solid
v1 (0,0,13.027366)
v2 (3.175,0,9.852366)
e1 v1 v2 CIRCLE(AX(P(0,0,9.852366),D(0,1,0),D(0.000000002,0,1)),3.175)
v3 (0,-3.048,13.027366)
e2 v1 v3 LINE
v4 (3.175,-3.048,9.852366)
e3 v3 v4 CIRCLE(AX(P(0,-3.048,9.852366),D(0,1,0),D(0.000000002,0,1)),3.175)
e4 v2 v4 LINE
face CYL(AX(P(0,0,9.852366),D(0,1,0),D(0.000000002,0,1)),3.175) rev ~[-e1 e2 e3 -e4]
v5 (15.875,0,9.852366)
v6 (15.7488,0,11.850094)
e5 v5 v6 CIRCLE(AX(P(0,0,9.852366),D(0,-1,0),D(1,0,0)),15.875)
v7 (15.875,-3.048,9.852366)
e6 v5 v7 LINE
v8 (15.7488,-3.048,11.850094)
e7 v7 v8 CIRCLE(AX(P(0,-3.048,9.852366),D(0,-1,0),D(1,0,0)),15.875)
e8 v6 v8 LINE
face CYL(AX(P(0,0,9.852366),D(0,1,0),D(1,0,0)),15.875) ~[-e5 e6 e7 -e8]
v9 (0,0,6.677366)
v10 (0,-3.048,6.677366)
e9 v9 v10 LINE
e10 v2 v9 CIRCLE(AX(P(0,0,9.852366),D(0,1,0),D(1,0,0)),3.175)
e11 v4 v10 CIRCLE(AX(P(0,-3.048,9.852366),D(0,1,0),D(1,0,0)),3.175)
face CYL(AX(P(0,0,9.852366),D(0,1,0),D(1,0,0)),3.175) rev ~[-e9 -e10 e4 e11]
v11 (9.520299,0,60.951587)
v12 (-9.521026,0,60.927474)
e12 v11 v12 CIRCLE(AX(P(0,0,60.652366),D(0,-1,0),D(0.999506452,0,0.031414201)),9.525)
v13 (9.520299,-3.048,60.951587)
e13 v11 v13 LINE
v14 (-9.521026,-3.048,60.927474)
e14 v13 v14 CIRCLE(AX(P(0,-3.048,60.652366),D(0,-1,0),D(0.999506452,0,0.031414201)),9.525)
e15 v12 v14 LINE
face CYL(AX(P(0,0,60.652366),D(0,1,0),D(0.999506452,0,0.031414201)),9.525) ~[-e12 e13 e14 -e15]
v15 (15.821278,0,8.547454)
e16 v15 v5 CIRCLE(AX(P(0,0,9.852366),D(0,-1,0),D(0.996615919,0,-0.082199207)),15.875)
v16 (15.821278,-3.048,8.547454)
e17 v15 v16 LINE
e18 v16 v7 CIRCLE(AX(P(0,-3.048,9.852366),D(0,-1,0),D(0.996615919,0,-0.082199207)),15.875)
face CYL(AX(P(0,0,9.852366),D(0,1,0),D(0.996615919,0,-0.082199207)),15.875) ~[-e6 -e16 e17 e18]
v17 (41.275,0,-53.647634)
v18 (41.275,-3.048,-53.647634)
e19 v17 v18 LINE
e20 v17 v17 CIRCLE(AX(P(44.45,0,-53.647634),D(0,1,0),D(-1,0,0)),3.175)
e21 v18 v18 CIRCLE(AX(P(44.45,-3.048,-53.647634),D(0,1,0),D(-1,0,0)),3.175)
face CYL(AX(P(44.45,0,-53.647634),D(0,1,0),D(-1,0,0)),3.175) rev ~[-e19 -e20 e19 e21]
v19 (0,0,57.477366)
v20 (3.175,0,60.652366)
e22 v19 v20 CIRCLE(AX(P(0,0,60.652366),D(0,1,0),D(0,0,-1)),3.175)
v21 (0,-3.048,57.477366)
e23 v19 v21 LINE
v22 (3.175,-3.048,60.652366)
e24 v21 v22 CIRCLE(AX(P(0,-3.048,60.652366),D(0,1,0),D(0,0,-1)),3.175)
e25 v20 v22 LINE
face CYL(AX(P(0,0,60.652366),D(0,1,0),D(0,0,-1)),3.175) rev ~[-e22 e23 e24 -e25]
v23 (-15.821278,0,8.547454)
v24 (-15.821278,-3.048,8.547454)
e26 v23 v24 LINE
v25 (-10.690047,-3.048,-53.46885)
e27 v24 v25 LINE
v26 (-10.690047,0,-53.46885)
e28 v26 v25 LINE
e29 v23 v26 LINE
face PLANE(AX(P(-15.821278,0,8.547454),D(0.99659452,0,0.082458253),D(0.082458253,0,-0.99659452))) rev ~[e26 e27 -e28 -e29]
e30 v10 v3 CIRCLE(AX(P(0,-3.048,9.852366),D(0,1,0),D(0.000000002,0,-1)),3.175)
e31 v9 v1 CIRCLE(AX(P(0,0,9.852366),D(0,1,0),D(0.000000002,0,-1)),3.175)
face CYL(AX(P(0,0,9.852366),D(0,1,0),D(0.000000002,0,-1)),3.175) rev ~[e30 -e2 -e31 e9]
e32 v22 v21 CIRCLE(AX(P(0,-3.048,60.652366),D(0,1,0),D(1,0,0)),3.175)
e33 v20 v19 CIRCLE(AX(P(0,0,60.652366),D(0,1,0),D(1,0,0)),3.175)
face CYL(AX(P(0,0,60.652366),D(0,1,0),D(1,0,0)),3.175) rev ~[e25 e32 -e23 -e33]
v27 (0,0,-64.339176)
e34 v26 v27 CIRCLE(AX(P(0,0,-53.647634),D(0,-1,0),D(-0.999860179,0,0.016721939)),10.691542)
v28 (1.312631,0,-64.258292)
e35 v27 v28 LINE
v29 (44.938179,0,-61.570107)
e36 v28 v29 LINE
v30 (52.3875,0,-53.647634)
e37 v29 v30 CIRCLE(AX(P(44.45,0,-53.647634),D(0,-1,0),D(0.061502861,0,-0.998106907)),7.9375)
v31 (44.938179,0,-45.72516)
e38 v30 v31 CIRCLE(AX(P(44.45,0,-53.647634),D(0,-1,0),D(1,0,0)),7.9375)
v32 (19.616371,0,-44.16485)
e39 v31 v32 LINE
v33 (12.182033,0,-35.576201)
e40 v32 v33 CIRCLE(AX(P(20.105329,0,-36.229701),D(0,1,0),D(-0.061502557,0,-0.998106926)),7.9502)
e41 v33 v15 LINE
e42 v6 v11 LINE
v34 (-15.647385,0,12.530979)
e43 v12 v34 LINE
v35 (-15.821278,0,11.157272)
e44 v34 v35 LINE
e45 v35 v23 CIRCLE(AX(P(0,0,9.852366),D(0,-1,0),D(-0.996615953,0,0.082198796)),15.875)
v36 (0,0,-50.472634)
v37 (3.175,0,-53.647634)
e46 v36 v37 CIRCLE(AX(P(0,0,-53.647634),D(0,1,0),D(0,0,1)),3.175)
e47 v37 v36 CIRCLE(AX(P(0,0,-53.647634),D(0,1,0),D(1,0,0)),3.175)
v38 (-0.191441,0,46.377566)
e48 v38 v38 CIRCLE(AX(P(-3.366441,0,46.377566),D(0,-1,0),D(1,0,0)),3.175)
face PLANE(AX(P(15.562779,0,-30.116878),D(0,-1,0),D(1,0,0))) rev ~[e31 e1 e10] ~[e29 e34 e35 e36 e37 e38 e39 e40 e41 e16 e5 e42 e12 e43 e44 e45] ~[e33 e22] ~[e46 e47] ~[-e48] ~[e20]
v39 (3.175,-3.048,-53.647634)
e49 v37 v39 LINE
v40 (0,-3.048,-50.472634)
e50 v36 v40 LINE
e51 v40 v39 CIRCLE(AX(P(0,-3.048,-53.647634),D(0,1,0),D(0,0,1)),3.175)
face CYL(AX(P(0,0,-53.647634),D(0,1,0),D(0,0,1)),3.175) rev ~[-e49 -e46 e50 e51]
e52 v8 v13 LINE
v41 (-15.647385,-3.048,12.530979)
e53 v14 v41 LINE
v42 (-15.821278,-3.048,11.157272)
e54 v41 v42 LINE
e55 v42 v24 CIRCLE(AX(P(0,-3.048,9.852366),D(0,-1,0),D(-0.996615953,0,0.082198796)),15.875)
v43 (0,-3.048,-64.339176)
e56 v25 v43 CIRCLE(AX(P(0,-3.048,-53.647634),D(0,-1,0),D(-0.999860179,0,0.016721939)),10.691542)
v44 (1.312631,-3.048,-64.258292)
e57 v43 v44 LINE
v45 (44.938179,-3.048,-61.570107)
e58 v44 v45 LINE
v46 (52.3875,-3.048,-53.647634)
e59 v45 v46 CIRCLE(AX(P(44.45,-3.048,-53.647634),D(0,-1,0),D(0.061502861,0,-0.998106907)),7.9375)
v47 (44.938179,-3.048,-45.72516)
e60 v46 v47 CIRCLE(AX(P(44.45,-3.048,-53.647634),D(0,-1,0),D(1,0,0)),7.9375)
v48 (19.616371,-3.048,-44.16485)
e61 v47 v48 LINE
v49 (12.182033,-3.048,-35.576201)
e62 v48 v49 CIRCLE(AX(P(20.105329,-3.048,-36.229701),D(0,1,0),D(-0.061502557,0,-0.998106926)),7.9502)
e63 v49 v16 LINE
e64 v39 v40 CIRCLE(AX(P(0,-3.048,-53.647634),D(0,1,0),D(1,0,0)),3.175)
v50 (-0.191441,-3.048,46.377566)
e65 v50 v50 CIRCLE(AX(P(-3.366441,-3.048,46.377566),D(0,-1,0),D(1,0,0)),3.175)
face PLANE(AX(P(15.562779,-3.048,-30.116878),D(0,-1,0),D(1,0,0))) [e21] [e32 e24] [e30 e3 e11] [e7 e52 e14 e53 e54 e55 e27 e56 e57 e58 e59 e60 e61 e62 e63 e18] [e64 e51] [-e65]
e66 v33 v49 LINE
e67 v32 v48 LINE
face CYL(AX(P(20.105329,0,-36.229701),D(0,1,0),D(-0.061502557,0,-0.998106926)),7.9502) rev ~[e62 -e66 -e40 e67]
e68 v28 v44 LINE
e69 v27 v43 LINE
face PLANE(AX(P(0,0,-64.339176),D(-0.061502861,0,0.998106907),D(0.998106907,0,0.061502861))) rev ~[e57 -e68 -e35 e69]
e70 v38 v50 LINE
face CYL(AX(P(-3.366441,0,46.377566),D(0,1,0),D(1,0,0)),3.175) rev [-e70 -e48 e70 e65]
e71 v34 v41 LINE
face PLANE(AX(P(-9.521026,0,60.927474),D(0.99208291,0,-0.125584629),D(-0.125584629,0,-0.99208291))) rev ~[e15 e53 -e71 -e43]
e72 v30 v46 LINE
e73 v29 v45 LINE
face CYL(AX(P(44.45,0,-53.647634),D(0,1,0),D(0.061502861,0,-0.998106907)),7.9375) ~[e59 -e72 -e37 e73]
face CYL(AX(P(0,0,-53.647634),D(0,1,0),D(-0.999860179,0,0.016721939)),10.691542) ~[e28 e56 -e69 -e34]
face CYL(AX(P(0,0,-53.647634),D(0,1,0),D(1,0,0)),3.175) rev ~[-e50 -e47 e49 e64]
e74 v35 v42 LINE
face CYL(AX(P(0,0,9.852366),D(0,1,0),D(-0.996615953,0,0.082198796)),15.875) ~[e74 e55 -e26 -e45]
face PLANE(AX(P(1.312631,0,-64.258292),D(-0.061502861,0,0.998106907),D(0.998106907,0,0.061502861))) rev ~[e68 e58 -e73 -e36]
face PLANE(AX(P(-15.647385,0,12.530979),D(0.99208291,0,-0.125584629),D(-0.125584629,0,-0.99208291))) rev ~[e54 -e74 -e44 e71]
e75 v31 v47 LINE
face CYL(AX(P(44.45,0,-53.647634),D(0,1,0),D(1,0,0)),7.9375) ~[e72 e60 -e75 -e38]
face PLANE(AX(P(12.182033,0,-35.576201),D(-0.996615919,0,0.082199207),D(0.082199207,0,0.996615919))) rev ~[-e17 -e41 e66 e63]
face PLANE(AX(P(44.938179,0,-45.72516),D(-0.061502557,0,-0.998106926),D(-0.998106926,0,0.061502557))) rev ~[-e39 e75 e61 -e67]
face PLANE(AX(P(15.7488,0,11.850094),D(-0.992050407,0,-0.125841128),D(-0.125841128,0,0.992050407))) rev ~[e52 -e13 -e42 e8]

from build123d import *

# Parameters (mm, degrees)
F0_R     = 3.175
F1_DEPTH = 3.048


# Not quite as in the source:
# - ends of sketch curves that miss each other by under 0.0002 mm in the source are joined


with BuildPart() as f1:
    # F0 (on Front) → F1 (new body)
    with BuildSketch(Plane.XZ):
        with BuildLine():
            ThreePointArc((0, -42.9560914541), (7.5600620245, -46.0875716771), (10.6915422474, -53.6476337016))
            Line((10.6915422474, -53.6476337016), (36.5125, -53.6476337016))
            ThreePointArc((36.5125, -53.6476337016), (39.0126759444, -47.8649515069), (44.9381789581, -45.725160126))
            Line((44.9381789581, -45.725160126), (19.6163710563, -44.1648504083))
            ThreePointArc((19.6163710563, -44.1648504083), (14.0942781367, -41.4328681595), (12.1820328049, -35.5762005907))
            Line((12.1820328049, -35.5762005907), (15.8212777121, 8.5474538872))
            ThreePointArc((15.8212777121, 8.5474538872), (10.7540722598, -1.825200003), (0, -6.0226337016))
            Line((0, -6.0226337016), (0, -42.9560914541))
        make_face()
        with BuildLine():
            ThreePointArc((-10.690047341, -53.4688503814), (-7.4965860966, -46.0246242876), (0, -42.9560914541))
            Line((0, -42.9560914541), (0, -6.0226337016))
            ThreePointArc((0, -6.0226337016), (-10.7540722823, -1.8251999914), (-15.8212777256, 8.5474539313))
            Line((-15.8212777256, 8.5474539313), (-10.690047341, -53.4688503814))
        make_face()
        with BuildLine():
            Line((10.6915422474, -53.6476337016), (3.175, -53.6476337016))
            ThreePointArc((3.175, -53.6476337016), (-2.2450640303, -55.8926977318), (0, -50.4726337016))
            Line((0, -50.4726337016), (0, -42.9560914541))
            ThreePointArc((0, -42.9560914541), (-7.4965860966, -46.0246242876), (-10.690047341, -53.4688503814))
            ThreePointArc((-10.690047341, -53.4688503814), (-7.6230094139, -61.1442197982), (0, -64.339175949))
            Line((0, -64.339175949), (1.3126312246, -64.2582922531))
            ThreePointArc((1.3126312246, -64.2582922531), (8.0107155679, -60.7284183839), (10.6915422474, -53.6476337016))
        make_face()
        with BuildLine():
            ThreePointArc((0, -50.4726337016), (2.2450640303, -51.4025696713), (3.175, -53.6476337016))
            Line((3.175, -53.6476337016), (10.6915422474, -53.6476337016))
            ThreePointArc((10.6915422474, -53.6476337016), (7.5600620245, -46.0875716771), (0, -42.9560914541))
            Line((0, -42.9560914541), (0, -50.4726337016))
        make_face()
        with BuildLine():
            Line((36.5125, -53.6476337016), (10.6915422474, -53.6476337016))
            ThreePointArc((10.6915422474, -53.6476337016), (8.0107155679, -60.7284183839), (1.3126312246, -64.2582922531))
            Line((1.3126312246, -64.2582922531), (44.9381789581, -61.5701072771))
            ThreePointArc((44.9381789581, -61.5701072771), (39.0126759444, -59.4303158963), (36.5125, -53.6476337016))
        make_face()
        with BuildLine():
            ThreePointArc((44.9381789581, -45.725160126), (39.0126759444, -47.8649515069), (36.5125, -53.6476337016))
            ThreePointArc((36.5125, -53.6476337016), (39.0126759444, -59.4303158963), (44.9381789581, -61.5701072771))
            ThreePointArc((44.9381789581, -61.5701072771), (50.2326821947, -59.0849577571), (52.3875, -53.6476337016))
            ThreePointArc((52.3875, -53.6476337016), (50.2326821947, -48.210309646), (44.9381789581, -45.725160126))
        make_face()
        with BuildLine():
            ThreePointArc((47.625, -53.6476337016), (44.45, -56.8226337016), (41.275, -53.6476337016))
            ThreePointArc((41.275, -53.6476337016), (44.45, -50.4726337016), (47.625, -53.6476337016))
        make_face(mode=Mode.SUBTRACT)
        with BuildLine():
            ThreePointArc((-15.8212777256, 8.5474539313), (-10.7540722823, -1.8251999914), (0, -6.0226337016))
            Line((0, -6.0226337016), (0, 6.6773662984))
            ThreePointArc((0, 6.6773662984), (-3.1750000049, 9.8523662984), (0, 13.0273662984))
            Line((0, 13.0273662984), (0, 25.7273662984))
            ThreePointArc((0, 25.7273662984), (-10.2345652868, 21.9878225524), (-15.6473851089, 12.5309787019))
            Line((-15.6473851089, 12.5309787019), (-15.8212782601, 11.157272185))
            ThreePointArc((-15.8212782601, 11.157272185), (-15.8750000049, 9.8523630471), (-15.8212777256, 8.5474539313))
        make_face()
        with BuildLine():
            Line((0, 6.6773662984), (0, -6.0226337016))
            ThreePointArc((0, -6.0226337016), (10.7540722598, -1.825200003), (15.8212777121, 8.5474538872))
            ThreePointArc((15.8212777121, 8.5474538872), (15.8615637383, 9.1993574002), (15.8749999951, 9.8523662984))
            ThreePointArc((15.8749999951, 9.8523662984), (15.843418635, 10.8532213331), (15.7488002092, 11.8500942118))
            ThreePointArc((15.7488002092, 11.8500942118), (10.4952773724, 21.7630664363), (0, 25.7273662984))
            Line((0, 25.7273662984), (0, 13.0273662984))
            ThreePointArc((0, 13.0273662984), (2.2450640271, 12.097430327), (3.1749999951, 9.8523662984))
            ThreePointArc((3.1749999951, 9.8523662984), (2.2450640271, 7.6073022699), (0, 6.6773662984))
        make_face()
        with BuildLine():
            ThreePointArc((0, 25.7273662984), (10.4952773724, 21.7630664363), (15.7488002092, 11.8500942118))
            Line((15.7488002092, 11.8500942118), (9.5202989573, 60.9515865588))
            ThreePointArc((9.5202989573, 60.9515865588), (9.5238246668, 60.801994892), (9.525, 60.6523662984))
            ThreePointArc((9.525, 60.6523662984), (6.7351920908, 53.9171742076), (0, 51.1273662984))
            Line((0, 51.1273662984), (0, 25.7273662984))
        make_face()
        with BuildLine():
            Line((-9.5210262398, 60.9274741696), (-15.6473851089, 12.5309787019))
            ThreePointArc((-15.6473851089, 12.5309787019), (-10.2345652868, 21.9878225524), (0, 25.7273662984))
            Line((0, 25.7273662984), (0, 51.1273662984))
            ThreePointArc((0, 51.1273662984), (-6.8317650528, 54.0151521793), (-9.5210262398, 60.9274741696))
        make_face()
        with Locations((-3.3664405459, 46.3775662984)):
            Circle(F0_R, mode=Mode.SUBTRACT)
        with BuildLine():
            ThreePointArc((9.5202989573, 60.9515865588), (-0.0120616774, 70.1773586615), (-9.5210262398, 60.9274741696))
            ThreePointArc((-9.5210262398, 60.9274741696), (-6.8317650528, 54.0151521793), (0, 51.1273662984))
            ThreePointArc((0, 51.1273662984), (6.7351920908, 53.9171742076), (9.525, 60.6523662984))
            ThreePointArc((9.525, 60.6523662984), (9.5238246668, 60.801994892), (9.5202989573, 60.9515865588))
        make_face()
        with BuildLine():
            ThreePointArc((3.175, 60.6523662984), (2.2450640303, 58.4073022682), (0, 57.4773662984))
            ThreePointArc((0, 57.4773662984), (-2.2450640303, 62.8974303287), (3.175, 60.6523662984))
        make_face(mode=Mode.SUBTRACT)
    extrude(amount=F1_DEPTH)


solid = f1.part
